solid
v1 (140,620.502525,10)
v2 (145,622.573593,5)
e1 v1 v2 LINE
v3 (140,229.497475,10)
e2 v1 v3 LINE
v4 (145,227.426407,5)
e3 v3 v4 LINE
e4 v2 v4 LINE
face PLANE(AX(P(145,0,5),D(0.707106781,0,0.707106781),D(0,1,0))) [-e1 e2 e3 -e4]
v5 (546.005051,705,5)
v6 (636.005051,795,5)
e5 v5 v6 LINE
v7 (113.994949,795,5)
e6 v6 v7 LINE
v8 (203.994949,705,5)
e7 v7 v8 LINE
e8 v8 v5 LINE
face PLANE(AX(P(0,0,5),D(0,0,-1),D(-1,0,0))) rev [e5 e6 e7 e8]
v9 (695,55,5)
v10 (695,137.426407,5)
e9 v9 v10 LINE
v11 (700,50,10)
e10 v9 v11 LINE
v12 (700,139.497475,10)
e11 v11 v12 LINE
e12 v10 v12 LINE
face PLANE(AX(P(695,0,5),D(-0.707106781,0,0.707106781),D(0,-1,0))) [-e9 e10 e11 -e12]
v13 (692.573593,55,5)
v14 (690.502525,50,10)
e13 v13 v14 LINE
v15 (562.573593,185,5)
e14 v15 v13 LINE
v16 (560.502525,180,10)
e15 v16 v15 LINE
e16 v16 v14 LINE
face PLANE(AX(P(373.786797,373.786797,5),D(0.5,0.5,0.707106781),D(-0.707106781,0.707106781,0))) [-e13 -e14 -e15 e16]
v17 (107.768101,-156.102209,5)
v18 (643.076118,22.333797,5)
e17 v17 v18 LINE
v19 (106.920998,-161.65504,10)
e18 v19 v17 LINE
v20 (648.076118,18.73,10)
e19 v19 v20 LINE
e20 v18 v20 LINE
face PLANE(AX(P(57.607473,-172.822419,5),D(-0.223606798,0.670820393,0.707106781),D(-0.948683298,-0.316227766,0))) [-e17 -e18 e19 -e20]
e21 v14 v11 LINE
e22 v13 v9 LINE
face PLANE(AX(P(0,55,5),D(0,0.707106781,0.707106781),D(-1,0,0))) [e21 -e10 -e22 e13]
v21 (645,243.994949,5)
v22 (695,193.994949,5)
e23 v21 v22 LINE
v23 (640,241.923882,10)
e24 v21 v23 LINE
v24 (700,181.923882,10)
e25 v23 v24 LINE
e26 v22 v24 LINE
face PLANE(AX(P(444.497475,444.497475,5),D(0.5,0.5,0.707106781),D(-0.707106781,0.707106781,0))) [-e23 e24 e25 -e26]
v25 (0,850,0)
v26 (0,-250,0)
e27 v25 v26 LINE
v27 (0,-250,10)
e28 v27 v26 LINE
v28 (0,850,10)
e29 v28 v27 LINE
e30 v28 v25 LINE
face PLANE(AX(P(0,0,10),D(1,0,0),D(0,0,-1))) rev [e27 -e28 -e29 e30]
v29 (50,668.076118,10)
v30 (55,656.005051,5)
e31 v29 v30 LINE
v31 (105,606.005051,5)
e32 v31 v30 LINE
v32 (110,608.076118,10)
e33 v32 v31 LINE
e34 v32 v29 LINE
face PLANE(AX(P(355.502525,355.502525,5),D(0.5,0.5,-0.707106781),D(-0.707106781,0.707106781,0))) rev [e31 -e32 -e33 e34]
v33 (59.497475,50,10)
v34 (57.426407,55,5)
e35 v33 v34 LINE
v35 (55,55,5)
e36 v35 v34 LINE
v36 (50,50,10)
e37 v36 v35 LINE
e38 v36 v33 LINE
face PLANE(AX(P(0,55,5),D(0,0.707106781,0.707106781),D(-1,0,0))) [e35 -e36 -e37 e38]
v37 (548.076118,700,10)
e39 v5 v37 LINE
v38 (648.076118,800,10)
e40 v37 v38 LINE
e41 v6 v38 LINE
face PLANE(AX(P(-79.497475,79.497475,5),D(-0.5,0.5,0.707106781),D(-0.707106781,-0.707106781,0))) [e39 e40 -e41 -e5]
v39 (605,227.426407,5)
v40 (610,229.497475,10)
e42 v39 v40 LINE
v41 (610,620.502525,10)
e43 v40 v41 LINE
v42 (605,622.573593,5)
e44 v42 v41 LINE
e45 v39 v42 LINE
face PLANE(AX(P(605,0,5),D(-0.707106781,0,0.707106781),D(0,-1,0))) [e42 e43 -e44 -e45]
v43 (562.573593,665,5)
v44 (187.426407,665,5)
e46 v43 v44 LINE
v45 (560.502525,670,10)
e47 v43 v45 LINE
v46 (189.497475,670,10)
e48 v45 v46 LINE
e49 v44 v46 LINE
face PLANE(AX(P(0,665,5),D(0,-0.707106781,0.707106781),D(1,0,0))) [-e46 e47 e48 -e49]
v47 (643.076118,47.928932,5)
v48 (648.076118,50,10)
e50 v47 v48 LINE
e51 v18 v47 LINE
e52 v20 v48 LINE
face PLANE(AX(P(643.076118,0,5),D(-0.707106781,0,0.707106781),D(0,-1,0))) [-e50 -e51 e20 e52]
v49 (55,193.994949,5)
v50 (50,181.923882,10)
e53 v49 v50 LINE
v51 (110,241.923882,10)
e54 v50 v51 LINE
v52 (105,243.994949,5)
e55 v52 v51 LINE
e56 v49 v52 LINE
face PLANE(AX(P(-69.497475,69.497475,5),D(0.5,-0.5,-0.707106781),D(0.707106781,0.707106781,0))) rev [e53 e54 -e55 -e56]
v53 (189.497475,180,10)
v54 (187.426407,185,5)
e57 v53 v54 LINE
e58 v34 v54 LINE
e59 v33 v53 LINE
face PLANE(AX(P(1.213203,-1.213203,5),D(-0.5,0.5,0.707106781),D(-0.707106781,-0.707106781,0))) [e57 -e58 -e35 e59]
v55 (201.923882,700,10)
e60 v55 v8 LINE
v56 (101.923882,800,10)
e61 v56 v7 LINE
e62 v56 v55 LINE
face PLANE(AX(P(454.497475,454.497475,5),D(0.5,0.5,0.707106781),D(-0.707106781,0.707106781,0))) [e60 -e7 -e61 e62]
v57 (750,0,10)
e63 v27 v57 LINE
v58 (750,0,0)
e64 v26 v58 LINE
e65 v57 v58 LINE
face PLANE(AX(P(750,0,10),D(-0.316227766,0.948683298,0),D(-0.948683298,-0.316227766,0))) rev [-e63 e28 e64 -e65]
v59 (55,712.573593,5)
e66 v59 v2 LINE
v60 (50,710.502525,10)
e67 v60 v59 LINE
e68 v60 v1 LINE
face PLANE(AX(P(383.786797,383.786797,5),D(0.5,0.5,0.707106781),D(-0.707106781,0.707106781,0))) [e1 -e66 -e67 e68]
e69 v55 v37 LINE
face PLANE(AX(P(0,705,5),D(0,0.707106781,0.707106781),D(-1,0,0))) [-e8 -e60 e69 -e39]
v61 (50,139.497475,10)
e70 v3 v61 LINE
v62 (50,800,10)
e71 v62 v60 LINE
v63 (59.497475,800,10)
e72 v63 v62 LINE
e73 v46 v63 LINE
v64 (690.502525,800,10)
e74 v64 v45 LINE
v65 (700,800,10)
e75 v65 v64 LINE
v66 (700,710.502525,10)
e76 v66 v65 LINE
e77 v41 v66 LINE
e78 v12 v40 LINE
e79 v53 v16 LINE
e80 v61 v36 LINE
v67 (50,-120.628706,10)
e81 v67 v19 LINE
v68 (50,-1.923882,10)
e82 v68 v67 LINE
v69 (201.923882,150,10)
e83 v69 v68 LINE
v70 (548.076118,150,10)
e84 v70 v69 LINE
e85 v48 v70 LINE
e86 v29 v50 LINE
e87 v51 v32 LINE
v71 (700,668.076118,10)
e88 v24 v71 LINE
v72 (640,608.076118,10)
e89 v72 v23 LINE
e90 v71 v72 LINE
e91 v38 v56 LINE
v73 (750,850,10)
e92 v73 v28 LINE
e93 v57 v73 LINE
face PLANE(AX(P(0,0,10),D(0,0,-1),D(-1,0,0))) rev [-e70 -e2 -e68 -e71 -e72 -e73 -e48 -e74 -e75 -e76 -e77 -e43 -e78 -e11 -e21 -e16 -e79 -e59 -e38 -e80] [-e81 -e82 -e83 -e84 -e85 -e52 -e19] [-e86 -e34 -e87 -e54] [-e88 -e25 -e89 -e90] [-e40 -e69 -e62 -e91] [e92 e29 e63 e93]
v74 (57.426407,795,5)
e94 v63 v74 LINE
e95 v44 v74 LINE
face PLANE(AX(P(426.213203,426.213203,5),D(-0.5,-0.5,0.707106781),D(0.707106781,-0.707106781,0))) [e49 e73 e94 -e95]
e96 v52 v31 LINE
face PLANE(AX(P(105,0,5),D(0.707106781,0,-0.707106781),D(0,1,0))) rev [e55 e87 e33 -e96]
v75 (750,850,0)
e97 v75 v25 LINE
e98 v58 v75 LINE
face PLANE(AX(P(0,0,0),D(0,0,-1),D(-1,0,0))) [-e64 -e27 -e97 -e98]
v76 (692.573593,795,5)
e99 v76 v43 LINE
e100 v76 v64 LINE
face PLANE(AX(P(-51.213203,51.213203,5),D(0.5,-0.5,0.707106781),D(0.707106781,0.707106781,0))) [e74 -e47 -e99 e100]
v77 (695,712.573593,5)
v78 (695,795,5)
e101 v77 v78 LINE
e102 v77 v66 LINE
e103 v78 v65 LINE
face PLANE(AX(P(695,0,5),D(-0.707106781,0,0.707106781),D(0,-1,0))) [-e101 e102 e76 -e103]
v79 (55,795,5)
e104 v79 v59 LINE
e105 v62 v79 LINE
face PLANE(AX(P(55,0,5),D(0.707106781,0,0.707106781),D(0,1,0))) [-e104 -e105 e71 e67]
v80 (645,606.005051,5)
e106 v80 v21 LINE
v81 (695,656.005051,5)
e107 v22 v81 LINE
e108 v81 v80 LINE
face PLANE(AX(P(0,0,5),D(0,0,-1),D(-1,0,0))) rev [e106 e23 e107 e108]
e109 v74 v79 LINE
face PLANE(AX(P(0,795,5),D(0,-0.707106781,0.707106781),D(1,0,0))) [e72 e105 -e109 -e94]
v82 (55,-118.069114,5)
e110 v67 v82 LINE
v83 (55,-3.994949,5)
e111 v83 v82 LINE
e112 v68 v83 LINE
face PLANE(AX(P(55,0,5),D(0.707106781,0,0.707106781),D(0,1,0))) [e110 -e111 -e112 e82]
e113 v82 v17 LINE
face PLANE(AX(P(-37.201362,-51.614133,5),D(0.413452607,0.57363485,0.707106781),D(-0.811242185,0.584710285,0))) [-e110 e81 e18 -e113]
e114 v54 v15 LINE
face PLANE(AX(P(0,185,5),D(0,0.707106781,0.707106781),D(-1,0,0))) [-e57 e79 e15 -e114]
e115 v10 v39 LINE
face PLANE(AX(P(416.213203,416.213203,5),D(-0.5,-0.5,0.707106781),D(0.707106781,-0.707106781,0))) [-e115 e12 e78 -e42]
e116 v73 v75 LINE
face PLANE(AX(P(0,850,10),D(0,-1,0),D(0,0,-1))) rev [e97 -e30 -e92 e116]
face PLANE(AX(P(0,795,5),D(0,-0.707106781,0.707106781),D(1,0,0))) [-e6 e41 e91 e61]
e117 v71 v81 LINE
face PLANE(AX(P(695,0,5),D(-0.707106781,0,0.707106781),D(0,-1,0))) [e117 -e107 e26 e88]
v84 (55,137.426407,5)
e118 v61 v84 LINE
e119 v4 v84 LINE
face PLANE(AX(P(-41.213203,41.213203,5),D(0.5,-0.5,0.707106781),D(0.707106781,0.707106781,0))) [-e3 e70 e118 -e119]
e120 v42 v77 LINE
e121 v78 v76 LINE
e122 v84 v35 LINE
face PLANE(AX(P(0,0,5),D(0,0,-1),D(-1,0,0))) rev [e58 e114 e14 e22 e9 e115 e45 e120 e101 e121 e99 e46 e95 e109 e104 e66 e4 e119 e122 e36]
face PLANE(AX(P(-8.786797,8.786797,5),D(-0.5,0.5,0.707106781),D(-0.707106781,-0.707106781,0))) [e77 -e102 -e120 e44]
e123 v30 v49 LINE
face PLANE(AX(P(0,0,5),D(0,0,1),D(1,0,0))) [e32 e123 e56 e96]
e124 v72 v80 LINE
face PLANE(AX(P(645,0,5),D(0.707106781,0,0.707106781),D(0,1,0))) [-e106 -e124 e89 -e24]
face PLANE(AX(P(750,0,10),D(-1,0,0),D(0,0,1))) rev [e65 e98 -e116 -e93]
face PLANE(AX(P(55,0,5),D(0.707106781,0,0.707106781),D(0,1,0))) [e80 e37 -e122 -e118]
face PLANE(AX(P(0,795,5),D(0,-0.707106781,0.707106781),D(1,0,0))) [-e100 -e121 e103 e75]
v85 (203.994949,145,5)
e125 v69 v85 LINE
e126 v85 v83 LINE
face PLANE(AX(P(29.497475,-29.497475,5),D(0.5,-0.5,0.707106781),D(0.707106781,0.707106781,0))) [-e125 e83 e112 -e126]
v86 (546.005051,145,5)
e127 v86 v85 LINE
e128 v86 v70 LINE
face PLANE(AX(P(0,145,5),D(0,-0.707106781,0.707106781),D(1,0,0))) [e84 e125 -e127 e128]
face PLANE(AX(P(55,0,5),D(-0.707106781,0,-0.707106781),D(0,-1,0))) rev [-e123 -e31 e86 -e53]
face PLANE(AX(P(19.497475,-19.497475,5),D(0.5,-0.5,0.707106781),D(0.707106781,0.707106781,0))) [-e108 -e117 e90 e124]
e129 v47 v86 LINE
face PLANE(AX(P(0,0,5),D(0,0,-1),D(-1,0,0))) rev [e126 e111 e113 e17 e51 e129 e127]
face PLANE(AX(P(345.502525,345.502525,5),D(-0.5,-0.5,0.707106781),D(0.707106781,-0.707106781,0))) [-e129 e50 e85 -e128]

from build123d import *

# Parameters (mm, degrees)
BOSS_EXTRU_1_DEPTH      = 10
ENL_V_MAT_EXTRU_1_DEPTH = 5
CHANFREIN1_SIZE         = 5


with BuildPart() as part:
    # Esquisse1 → Boss.-Extru.1 (new body)
    with BuildSketch(Plane.XY):
        Polygon((750, 0), (0, -250), (0, 0), (0, 850), (750, 850), align=None)
    extrude(amount=BOSS_EXTRU_1_DEPTH)

    # Esquisse2 → Enlèv. mat.-Extru.1 (cut)
    with BuildSketch(Plane.XY.offset(10)):
        Polygon((110, 241.923881554), (110, 608.076118446), (50, 668.076118446), (50, 181.923881554), align=None)
        Polygon((201.923881554, 700), (548.076118446, 700), (648.076118446, 800), (101.923881554, 800), align=None)
        Polygon((50, 800), (50, 710.502525317), (140, 620.502525317), (140, 229.497474683), (50, 139.497474683), (50, 50), (59.497474683, 50), (189.497474683, 180), (560.502525317, 180), (690.502525317, 50), (700, 50), (700, 139.497474683), (610, 229.497474683), (610, 620.502525317), (700, 710.502525317), (700, 800), (690.502525317, 800), (560.502525317, 670), (189.497474683, 670), (59.497474683, 800), align=None)
        Polygon((700, 668.076118446), (700, 181.923881554), (640, 241.923881554), (640, 608.076118446), align=None)
        Polygon((648.076118446, 50), (548.076118446, 150), (201.923881554, 150), (101.923881554, 50), (50, -1.923881554), (50, -120.628705664), (106.920997883, -161.655039703), (648.076118446, 18.730000485), align=None)
    extrude(amount=-ENL_V_MAT_EXTRU_1_DEPTH, mode=Mode.SUBTRACT)

    # Chanfrein1
    chanfrein1_edges = [part.edges().sort_by_distance(p)[0] for p in [
        (50, 425, 5),
        (80, 638.076118446, 5),
        (124.497474683, 735, 5),
        (375, 670, 5),
        (140, 425, 5),
        (95, 665.502525317, 5),
        (50, 755.251262658, 5),
        (54.748737342, 800, 5),
        (375, 800, 5),
        (375, 700, 5),
        (151.923881554, 750, 5),
        (110, 425, 5),
        (80, 211.923881554, 5),
        (625.502525317, 735, 5),
        (695.251262658, 800, 5),
        (700, 755.251262658, 5),
        (655, 665.502525317, 5),
        (610, 425, 5),
        (655, 184.497474683, 5),
        (700, 94.748737342, 5),
        (695.251262658, 50, 5),
        (625.502525317, 115, 5),
        (375, 180, 5),
        (124.497474683, 115, 5),
        (54.748737342, 50, 5),
        (50, 94.748737342, 5),
        (95, 184.497474683, 5),
        (598.076118446, 750, 5),
        (700, 425, 5),
        (670, 211.923881554, 5),
        (640, 425, 5),
        (670, 638.076118446, 5),
        (375, 150, 5),
        (598.076118446, 100, 5),
        (648.076118446, 34.365000242, 5),
        (377.498558164, -71.462519609, 5),
        (78.460498942, -141.141872683, 5),
        (50, -61.276293609, 5),
        (125.961940777, 74.038059223, 5),
    ]]
    chamfer(chanfrein1_edges, length=CHANFREIN1_SIZE - 0.0001)  # a hair under: the kernel refuses the full size


solid = part.part
